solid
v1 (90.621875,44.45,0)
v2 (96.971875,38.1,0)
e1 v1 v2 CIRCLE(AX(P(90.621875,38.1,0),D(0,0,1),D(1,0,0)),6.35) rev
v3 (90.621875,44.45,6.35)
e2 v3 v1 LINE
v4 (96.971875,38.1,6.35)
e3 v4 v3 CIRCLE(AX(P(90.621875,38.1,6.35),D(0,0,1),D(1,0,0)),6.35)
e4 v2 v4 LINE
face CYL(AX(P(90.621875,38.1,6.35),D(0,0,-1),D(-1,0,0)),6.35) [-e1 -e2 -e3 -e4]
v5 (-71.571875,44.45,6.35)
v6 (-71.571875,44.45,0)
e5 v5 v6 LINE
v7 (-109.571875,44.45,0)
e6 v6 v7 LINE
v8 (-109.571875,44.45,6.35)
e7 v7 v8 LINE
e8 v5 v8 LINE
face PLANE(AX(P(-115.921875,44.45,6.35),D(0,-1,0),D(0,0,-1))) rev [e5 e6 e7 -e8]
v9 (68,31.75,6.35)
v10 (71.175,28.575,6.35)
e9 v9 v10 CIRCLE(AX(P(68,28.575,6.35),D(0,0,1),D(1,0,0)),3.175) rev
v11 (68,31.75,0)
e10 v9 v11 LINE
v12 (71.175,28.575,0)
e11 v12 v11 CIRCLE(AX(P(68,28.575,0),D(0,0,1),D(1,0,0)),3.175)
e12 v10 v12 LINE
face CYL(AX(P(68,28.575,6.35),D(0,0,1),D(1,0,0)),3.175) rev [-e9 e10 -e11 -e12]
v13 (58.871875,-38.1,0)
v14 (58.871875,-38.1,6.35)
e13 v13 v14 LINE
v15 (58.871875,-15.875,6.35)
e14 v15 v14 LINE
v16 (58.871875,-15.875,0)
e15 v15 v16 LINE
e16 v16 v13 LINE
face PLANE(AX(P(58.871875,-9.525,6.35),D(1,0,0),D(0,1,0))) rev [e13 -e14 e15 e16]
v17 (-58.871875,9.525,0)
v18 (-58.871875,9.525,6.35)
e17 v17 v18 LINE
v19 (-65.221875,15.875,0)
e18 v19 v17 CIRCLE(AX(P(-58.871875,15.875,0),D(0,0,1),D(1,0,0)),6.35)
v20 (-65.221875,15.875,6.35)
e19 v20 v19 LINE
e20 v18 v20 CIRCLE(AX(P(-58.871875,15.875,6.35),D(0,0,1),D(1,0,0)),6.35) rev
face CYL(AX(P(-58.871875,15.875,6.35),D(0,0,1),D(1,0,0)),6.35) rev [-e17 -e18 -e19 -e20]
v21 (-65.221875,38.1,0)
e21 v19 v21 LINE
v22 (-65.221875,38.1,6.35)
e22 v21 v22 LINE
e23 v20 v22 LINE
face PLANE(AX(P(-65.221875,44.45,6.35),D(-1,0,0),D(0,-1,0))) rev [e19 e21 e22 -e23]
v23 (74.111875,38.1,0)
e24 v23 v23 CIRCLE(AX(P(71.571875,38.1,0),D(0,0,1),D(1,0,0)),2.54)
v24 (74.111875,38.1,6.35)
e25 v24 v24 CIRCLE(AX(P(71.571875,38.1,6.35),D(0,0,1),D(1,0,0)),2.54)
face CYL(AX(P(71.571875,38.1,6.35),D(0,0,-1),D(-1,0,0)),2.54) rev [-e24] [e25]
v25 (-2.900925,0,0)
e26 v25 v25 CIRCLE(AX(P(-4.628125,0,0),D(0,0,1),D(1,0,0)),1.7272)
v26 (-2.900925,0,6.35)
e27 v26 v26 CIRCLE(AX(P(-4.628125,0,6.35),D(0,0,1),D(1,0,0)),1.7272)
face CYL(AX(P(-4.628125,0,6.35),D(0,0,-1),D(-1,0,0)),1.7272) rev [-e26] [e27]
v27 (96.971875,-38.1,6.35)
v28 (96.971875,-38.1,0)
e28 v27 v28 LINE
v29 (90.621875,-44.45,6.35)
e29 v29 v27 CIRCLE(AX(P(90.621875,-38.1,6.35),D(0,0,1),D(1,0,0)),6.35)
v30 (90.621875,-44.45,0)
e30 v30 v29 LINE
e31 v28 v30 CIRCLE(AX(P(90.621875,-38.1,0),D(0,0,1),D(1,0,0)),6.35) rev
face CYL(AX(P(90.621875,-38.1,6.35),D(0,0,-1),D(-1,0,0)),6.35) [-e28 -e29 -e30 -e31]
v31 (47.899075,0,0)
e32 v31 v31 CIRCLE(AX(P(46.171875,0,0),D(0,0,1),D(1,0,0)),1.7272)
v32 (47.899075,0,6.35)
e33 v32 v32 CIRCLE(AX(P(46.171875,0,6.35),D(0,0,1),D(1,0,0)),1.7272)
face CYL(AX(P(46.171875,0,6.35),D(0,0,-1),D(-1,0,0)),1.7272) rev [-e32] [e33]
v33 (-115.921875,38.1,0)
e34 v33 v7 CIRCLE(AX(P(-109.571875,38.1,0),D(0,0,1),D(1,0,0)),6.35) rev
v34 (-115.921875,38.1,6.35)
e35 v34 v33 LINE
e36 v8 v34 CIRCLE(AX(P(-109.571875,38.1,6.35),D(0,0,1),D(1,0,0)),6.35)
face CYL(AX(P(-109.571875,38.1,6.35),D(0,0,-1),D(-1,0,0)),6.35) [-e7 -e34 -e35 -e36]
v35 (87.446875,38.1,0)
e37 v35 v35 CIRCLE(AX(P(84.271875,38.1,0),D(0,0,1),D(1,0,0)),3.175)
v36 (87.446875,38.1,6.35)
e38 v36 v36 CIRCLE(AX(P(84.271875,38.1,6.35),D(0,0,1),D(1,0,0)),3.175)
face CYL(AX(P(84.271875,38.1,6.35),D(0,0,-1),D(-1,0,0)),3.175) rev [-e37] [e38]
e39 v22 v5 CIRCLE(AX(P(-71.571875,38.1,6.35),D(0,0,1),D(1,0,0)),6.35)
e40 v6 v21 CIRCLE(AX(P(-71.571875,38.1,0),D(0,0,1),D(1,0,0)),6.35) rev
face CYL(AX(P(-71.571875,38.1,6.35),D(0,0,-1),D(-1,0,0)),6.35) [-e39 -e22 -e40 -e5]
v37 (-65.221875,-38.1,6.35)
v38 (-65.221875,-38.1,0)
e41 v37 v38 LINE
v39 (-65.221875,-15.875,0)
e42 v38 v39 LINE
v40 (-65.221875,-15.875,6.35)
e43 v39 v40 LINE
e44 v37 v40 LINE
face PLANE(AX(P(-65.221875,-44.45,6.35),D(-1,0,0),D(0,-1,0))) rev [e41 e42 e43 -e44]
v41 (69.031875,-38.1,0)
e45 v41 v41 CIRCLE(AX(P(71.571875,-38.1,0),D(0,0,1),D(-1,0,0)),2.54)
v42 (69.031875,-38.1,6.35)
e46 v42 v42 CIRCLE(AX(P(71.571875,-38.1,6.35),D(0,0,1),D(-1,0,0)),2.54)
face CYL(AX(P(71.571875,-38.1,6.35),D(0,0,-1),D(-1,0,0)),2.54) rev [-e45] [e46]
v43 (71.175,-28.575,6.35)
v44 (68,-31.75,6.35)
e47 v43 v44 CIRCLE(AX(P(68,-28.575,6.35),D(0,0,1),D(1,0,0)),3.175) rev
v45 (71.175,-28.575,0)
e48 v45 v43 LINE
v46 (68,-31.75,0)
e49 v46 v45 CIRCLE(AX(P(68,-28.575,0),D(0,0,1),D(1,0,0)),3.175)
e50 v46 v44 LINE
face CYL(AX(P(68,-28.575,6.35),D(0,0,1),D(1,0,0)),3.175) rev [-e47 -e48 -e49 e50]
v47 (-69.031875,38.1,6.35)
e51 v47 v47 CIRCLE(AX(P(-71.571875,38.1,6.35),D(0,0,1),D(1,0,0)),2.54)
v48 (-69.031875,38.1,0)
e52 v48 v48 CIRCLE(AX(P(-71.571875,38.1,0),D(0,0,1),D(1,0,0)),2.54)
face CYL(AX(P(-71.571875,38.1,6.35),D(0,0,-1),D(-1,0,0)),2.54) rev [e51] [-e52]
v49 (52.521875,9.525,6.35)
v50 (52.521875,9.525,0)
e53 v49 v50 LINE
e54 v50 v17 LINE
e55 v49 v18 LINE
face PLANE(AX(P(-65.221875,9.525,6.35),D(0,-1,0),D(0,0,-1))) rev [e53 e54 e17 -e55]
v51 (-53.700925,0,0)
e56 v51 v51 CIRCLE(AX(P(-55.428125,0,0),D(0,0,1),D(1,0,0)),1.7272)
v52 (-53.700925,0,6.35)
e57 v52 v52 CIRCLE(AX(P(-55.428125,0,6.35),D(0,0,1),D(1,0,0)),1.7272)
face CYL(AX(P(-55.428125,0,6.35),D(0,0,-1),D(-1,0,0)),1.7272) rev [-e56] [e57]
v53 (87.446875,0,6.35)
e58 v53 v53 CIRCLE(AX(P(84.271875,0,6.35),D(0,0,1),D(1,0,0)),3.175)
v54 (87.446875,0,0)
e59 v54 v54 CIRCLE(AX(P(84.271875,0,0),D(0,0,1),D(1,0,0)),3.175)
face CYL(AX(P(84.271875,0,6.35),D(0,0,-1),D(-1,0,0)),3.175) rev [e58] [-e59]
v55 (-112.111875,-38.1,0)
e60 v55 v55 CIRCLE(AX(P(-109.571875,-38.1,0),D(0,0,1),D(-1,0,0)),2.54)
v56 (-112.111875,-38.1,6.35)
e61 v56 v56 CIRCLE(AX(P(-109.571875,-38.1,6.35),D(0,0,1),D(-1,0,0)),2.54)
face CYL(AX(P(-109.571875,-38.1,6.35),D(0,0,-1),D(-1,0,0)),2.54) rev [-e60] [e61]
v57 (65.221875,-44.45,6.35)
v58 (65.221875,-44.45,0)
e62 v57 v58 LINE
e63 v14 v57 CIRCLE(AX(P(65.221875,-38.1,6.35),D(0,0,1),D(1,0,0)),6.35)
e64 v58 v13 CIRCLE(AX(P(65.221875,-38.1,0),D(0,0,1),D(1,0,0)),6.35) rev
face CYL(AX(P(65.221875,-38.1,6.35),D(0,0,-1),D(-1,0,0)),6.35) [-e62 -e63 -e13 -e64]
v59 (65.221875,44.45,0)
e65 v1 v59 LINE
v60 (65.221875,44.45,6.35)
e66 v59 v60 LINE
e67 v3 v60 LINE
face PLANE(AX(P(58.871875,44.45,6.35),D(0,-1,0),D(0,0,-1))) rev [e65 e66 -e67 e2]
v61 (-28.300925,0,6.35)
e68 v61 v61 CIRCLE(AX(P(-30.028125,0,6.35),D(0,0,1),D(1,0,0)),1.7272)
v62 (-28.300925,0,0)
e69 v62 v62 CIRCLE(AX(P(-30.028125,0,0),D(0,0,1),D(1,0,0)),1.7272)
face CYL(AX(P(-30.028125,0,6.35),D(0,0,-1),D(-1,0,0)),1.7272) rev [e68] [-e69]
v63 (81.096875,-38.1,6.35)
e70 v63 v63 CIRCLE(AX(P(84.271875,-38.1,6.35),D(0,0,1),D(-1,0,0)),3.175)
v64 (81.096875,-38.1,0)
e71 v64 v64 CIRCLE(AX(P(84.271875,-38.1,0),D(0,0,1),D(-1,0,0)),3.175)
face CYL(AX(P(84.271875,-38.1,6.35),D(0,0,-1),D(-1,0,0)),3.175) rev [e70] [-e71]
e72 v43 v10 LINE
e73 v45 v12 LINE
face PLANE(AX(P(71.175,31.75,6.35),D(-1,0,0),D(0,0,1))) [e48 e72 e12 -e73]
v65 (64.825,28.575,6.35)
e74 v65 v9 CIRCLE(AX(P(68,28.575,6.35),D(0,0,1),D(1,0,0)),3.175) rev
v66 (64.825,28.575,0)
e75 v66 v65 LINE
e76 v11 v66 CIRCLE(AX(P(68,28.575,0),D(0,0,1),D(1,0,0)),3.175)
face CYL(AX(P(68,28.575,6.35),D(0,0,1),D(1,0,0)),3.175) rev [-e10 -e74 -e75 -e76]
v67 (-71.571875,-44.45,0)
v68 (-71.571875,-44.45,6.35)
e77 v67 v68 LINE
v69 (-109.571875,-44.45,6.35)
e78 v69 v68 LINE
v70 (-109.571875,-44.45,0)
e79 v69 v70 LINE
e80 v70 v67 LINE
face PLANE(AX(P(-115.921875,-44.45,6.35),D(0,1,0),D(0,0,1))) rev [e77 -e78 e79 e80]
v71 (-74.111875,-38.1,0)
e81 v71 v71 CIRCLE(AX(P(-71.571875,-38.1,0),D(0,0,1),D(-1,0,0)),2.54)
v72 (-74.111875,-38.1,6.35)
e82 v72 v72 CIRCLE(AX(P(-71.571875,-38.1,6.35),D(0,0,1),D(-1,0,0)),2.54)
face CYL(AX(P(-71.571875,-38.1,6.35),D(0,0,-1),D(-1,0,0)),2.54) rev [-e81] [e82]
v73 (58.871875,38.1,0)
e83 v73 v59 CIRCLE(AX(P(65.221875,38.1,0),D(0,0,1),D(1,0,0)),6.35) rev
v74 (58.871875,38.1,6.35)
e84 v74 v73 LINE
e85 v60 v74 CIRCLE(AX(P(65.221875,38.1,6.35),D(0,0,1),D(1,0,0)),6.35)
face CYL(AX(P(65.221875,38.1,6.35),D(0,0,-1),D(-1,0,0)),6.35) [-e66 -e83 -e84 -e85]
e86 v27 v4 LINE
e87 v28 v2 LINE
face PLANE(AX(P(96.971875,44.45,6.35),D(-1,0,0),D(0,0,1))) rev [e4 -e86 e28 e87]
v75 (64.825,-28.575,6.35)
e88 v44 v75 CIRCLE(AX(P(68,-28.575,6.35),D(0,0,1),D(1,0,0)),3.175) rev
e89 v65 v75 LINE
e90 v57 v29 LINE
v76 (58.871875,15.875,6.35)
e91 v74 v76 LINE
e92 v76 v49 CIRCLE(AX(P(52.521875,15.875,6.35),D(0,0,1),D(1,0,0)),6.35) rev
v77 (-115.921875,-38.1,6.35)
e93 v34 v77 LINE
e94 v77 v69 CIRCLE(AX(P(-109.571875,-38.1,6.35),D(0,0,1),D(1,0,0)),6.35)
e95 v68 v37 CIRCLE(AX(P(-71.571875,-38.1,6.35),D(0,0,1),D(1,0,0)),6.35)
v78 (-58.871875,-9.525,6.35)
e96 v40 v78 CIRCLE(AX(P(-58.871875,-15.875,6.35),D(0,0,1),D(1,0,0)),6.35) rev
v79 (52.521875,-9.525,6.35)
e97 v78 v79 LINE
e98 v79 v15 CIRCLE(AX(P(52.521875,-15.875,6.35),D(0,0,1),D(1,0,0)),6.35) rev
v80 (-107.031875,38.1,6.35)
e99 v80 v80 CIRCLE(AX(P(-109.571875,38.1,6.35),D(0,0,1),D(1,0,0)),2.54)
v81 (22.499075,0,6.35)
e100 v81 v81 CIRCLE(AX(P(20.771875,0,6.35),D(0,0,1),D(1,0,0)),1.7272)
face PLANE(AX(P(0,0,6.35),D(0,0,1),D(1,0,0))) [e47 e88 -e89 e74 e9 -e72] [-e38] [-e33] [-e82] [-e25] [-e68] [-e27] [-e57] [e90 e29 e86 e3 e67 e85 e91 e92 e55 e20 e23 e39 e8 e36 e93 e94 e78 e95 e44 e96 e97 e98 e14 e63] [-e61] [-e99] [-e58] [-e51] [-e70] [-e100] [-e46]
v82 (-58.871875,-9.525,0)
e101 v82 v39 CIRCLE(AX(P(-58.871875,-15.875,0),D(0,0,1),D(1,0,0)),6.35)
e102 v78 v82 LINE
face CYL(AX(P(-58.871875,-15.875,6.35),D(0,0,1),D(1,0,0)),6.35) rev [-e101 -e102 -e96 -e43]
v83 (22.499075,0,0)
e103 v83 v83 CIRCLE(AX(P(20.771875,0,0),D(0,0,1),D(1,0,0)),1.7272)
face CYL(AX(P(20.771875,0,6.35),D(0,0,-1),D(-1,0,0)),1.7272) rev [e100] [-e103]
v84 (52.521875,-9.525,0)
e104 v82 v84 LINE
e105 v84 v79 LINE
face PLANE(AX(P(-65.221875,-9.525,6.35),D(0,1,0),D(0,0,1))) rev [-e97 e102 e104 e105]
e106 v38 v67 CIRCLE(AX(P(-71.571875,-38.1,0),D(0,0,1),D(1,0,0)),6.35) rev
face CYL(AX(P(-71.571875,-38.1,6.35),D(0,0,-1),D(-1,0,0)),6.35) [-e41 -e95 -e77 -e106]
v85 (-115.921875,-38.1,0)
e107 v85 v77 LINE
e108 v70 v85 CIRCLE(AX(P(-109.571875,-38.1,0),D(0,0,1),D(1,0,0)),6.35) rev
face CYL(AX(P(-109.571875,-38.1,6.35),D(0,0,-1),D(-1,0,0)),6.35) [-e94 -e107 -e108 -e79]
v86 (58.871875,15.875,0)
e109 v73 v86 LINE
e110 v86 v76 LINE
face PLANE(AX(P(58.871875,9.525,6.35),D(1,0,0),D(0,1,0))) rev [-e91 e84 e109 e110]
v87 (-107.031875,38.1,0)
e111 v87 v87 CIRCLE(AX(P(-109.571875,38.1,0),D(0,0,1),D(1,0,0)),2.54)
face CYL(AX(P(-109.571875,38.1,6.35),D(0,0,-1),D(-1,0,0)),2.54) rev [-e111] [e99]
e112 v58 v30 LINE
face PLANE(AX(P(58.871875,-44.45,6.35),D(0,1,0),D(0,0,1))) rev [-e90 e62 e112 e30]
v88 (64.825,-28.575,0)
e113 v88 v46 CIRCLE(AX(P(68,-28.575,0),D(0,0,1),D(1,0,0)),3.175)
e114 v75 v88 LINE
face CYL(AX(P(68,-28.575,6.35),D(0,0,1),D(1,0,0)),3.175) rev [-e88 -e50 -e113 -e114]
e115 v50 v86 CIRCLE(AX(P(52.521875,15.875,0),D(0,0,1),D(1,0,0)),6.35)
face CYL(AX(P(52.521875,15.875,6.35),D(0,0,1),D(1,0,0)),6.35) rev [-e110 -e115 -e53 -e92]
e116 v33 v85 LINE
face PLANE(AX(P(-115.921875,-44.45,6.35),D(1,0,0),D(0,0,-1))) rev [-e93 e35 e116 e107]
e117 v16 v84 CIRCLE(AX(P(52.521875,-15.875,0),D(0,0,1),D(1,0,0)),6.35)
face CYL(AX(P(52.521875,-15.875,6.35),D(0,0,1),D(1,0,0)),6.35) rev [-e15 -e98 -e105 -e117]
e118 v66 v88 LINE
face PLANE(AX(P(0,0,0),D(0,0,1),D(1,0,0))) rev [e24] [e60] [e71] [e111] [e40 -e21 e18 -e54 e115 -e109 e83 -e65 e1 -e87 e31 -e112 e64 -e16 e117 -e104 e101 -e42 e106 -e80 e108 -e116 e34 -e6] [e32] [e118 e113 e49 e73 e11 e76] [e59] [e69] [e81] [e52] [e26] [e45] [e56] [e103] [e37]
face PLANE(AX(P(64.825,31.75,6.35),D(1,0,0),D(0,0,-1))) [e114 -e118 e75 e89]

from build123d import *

# Parameters (mm, degrees)
SKETCH4_R           = 2.54
SKETCH4_R_2         = 3.175
SKETCH4_R_3         = 1.7272
SKETCH4_W           = 6.35
SKETCH4_H           = 63.5
BOSS_EXTRUDE4_DEPTH = 6.35
FILLET1_R           = 6.35
FILLET2_R           = 3.175


with BuildPart() as part:
    # Sketch4 → Boss-Extrude4 (new body)
    with BuildSketch(Plane.XY):
        Polygon((58.871875, 44.45), (96.971875, 44.45), (96.971875, -44.45), (58.871875, -44.45), (58.871875, -9.525), (-65.221875, -9.525), (-65.221875, -44.45), (-115.921875, -44.45), (-115.921875, 44.45), (-65.221875, 44.45), (-65.221875, 9.525), (58.871875, 9.525), align=None)
        with Locations((-109.571875, 38.1)):
            Circle(SKETCH4_R, mode=Mode.SUBTRACT)
        with Locations((84.271875, 38.1)):
            Circle(SKETCH4_R_2, mode=Mode.SUBTRACT)
        with Locations((46.171875, 0)):
            Circle(SKETCH4_R_3, mode=Mode.SUBTRACT)
        with Locations((20.771875, 0)):
            Circle(SKETCH4_R_3, mode=Mode.SUBTRACT)
        with Locations((-4.628125, 0)):
            Circle(SKETCH4_R_3, mode=Mode.SUBTRACT)
        with Locations((-30.028125, 0)):
            Circle(SKETCH4_R_3, mode=Mode.SUBTRACT)
        with Locations((71.571875, 38.1)):
            Circle(SKETCH4_R, mode=Mode.SUBTRACT)
        with Locations((-71.571875, 38.1)):
            Circle(SKETCH4_R, mode=Mode.SUBTRACT)
        with Locations(Location((84.271875, -38.1, 0), (0, 0, 180))):
            Circle(SKETCH4_R_2, mode=Mode.SUBTRACT)
        with Locations(Location((71.571875, -38.1, 0), (0, 0, 180))):
            Circle(SKETCH4_R, mode=Mode.SUBTRACT)
        with Locations(Location((-71.571875, -38.1, 0), (0, 0, 180))):
            Circle(SKETCH4_R, mode=Mode.SUBTRACT)
        with Locations(Location((-109.571875, -38.1, 0), (0, 0, 180))):
            Circle(SKETCH4_R, mode=Mode.SUBTRACT)
        with Locations((84.271875, 0)):
            Circle(SKETCH4_R_2, mode=Mode.SUBTRACT)
        with Locations((-55.428125, 0)):
            Circle(SKETCH4_R_3, mode=Mode.SUBTRACT)
        with Locations((68, 0)):
            Rectangle(SKETCH4_W, SKETCH4_H, mode=Mode.SUBTRACT)
    extrude(amount=BOSS_EXTRUDE4_DEPTH)

    # Fillet1
    fillet1_edges = [part.edges().sort_by_distance(p)[0] for p in [
        (58.871875, -9.525, 3.175),
        (-65.221875, -9.525, 3.175),
        (-65.221875, -44.45, 3.175),
        (-115.921875, -44.45, 3.175),
        (-115.921875, 44.45, 3.175),
        (-65.221875, 44.45, 3.175),
        (-65.221875, 9.525, 3.175),
        (58.871875, 9.525, 3.175),
        (58.871875, 44.45, 3.175),
        (96.971875, 44.45, 3.175),
        (96.971875, -44.45, 3.175),
        (58.871875, -44.45, 3.175),
    ]]
    fillet(fillet1_edges, radius=FILLET1_R)

    # Fillet2
    fillet2_edges = [part.edges().sort_by_distance(p)[0] for p in [
        (71.175, 31.75, 3.175),
        (64.825, 31.75, 3.175),
        (71.175, -31.75, 3.175),
        (64.825, -31.75, 3.175),
    ]]
    fillet(fillet2_edges, radius=FILLET2_R - 0.0001)  # a hair under: the kernel refuses the full size


solid = part.part
